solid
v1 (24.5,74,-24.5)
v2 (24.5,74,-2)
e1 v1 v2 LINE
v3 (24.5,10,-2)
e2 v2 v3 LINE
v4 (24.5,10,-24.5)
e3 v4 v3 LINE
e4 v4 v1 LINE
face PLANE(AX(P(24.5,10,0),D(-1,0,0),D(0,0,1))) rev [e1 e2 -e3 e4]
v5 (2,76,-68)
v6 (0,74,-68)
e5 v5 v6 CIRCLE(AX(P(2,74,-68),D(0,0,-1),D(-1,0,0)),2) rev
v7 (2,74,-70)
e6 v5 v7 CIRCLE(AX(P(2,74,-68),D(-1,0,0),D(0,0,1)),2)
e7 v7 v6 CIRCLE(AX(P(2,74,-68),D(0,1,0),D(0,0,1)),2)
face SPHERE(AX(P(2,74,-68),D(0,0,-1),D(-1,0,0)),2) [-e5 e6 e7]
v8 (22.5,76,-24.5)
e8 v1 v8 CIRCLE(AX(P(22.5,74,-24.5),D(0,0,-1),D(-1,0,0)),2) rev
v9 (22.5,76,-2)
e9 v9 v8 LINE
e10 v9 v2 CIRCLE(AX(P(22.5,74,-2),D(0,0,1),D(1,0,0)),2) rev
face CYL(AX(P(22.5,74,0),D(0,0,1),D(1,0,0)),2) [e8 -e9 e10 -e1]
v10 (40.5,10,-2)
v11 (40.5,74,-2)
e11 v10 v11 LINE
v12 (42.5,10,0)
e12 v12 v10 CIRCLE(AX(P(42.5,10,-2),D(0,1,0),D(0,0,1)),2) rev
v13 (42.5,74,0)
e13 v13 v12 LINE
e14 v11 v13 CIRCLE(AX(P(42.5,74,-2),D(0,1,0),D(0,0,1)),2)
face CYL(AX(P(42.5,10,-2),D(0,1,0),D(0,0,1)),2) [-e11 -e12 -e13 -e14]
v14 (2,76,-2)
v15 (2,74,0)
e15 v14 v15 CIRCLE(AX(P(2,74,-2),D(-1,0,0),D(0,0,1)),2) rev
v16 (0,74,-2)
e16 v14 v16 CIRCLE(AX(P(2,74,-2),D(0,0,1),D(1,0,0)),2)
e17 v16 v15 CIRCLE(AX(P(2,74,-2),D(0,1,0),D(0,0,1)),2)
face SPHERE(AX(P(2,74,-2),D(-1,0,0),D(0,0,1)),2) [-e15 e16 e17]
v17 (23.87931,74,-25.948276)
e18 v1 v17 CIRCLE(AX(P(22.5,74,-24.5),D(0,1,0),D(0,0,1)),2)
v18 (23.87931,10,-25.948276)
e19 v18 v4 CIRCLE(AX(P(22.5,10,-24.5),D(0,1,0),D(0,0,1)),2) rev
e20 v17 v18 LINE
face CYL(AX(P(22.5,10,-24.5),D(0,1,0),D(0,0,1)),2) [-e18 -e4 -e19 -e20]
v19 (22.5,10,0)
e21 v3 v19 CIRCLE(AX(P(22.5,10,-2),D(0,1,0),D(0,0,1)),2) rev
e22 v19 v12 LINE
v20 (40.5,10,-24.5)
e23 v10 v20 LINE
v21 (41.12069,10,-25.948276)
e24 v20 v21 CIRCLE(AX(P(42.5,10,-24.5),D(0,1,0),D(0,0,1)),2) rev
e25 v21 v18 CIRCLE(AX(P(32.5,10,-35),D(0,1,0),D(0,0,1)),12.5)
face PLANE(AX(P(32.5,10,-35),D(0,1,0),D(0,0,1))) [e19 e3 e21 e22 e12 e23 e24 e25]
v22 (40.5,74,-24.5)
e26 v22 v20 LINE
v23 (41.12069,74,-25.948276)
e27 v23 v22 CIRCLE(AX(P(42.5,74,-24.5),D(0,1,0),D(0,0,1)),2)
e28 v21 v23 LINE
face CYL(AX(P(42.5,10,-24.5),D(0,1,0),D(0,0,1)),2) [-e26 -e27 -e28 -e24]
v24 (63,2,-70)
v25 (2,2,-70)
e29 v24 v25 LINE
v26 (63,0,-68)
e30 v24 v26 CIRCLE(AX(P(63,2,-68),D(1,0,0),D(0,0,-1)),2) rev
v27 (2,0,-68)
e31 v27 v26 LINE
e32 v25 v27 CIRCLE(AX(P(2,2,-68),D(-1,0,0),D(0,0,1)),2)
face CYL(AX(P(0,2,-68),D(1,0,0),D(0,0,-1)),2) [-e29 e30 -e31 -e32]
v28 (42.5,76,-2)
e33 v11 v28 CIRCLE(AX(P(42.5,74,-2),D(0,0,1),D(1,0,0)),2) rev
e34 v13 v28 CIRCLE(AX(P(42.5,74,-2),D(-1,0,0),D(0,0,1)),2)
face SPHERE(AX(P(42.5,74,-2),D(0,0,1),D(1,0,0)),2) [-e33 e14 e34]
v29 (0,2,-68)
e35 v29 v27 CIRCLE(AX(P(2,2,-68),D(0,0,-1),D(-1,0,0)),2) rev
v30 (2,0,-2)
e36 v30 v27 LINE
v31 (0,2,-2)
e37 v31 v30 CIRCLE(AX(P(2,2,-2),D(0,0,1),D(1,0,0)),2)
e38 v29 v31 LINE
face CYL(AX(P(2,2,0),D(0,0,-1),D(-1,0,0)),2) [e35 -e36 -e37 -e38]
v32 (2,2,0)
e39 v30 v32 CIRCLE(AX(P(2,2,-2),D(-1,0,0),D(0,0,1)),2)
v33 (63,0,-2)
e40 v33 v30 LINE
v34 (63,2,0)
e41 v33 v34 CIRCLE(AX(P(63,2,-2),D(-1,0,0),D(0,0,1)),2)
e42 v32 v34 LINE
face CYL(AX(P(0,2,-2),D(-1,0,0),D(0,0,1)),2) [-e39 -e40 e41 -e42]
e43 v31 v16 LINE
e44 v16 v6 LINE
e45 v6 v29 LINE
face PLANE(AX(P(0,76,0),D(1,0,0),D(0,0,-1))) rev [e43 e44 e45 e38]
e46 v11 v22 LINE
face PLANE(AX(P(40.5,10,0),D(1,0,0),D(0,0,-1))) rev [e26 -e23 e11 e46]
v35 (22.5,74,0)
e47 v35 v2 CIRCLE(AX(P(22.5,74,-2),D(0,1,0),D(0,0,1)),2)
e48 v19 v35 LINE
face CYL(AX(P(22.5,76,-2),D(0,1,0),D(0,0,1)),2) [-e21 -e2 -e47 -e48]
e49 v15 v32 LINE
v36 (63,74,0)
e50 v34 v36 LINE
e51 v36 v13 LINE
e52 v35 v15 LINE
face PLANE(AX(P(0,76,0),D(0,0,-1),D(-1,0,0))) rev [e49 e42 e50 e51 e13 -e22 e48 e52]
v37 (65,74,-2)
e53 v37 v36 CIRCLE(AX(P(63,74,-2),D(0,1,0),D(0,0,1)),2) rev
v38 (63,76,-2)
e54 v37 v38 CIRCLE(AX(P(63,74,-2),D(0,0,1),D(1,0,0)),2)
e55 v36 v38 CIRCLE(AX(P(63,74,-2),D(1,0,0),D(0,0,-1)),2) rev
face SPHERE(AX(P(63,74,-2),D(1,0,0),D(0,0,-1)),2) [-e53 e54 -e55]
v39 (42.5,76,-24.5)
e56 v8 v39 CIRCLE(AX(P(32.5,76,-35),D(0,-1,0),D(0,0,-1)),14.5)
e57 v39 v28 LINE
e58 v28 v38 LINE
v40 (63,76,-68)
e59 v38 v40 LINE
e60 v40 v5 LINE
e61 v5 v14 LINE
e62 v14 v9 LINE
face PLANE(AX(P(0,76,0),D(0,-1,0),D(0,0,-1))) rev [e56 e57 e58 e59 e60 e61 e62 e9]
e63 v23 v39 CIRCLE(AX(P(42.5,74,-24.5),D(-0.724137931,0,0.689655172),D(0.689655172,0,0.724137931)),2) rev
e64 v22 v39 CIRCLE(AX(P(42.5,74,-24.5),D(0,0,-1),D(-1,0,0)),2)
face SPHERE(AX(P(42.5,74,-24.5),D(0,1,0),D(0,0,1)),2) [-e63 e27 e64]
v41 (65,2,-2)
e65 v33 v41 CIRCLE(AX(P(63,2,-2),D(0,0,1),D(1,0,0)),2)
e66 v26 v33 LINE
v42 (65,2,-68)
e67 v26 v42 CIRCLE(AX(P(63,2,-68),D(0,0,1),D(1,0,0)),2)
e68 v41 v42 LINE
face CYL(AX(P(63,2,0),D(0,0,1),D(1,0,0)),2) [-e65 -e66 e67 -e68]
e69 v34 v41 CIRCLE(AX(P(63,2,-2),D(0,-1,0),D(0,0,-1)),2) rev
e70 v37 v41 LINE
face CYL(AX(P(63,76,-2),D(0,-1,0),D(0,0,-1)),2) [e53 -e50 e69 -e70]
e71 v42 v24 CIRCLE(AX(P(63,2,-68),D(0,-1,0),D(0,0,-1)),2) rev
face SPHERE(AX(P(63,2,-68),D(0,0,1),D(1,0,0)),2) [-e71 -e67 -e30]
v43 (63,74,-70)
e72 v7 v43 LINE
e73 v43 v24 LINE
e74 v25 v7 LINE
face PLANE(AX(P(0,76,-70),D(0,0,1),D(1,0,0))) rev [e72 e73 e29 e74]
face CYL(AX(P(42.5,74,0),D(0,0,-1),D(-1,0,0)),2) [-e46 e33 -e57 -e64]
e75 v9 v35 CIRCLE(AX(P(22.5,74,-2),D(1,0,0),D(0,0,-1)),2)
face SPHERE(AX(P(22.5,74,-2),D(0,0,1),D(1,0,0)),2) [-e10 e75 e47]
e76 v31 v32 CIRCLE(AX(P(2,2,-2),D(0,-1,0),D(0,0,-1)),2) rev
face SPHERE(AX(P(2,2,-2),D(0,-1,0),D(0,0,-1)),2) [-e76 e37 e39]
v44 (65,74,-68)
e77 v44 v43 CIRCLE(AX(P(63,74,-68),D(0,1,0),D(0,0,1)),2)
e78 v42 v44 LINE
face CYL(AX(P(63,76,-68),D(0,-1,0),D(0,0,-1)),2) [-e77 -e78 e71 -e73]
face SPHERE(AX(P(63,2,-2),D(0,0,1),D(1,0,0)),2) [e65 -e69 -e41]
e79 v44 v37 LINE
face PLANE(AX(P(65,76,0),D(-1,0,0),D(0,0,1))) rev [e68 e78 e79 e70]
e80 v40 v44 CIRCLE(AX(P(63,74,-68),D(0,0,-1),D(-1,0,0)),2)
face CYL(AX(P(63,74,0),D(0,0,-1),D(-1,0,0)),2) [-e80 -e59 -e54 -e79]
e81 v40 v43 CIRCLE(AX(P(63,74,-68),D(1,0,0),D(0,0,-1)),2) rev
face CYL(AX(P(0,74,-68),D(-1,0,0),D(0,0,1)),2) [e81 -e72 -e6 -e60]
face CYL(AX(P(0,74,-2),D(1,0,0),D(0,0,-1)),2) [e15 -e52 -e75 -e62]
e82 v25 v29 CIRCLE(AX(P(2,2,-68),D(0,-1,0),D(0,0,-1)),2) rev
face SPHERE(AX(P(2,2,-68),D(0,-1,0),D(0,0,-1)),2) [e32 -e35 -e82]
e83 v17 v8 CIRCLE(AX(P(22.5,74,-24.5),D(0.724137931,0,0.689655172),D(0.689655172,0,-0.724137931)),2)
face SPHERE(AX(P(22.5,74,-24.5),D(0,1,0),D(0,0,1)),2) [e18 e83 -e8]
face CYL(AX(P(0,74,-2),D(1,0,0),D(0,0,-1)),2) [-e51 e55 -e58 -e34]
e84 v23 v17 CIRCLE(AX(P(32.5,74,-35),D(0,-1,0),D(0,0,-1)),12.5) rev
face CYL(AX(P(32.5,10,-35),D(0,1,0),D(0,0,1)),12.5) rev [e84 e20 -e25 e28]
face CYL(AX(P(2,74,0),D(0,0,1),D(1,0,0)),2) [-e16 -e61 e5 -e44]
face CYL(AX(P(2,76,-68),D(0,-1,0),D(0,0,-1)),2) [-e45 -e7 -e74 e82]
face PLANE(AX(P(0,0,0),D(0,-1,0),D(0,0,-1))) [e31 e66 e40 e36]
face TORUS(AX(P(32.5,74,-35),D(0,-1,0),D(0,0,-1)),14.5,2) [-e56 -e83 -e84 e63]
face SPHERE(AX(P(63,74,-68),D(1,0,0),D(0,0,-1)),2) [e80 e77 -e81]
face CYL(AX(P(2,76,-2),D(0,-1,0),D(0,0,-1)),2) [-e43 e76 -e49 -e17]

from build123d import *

# Parameters (mm, degrees)
SKETCH1_W           = 65
SKETCH1_H           = 70
BOSS_EXTRUDE1_DEPTH = 76
CUT_EXTRUDE1_DEPTH  = 66
FILLET1_R           = 2
FILLET2_R           = 2


with BuildPart() as part:
    # Sketch1 → Boss-Extrude1 (new body)
    with BuildSketch(Plane(origin=(0, 0, 0), x_dir=(1, 0, 0), z_dir=(0, 1, 0))):
        with Locations((32.5, 35)):
            Rectangle(SKETCH1_W, SKETCH1_H)
    extrude(amount=BOSS_EXTRUDE1_DEPTH)

    # Sketch2 → Cut-Extrude1 (cut)
    with BuildSketch(Plane(origin=(0, 76, 0), x_dir=(1, 0, 0), z_dir=(0, 1, 0))):
        with BuildLine():
            Line((24.5, 0), (24.5, 25.395313644))
            ThreePointArc((24.5, 25.395313644), (32.5, 47.5), (40.5, 25.395313644))
            Line((40.5, 25.395313644), (40.5, 0))
            Line((40.5, 0), (24.5, 0))
        make_face()
    extrude(amount=-CUT_EXTRUDE1_DEPTH, mode=Mode.SUBTRACT)

    # Fillet1
    fillet1_edges = [part.edges().sort_by_distance(p)[0] for p in [
        (65, 76, -35),
        (52.75, 76, 0),
        (32.5, 76, -70),
        (24.5, 43, -25.395313644),
        (40.5, 43, -25.395313644),
        (40.5, 43, 0),
        (24.5, 43, 0),
        (32.5, 76, -47.5),
        (24.5, 76, -12.697656822),
        (40.5, 76, -12.697656822),
        (0, 76, -35),
        (32.5, 0, -70),
        (32.5, 0, 0),
        (0, 0, -35),
        (0, 38, -70),
        (65, 38, -70),
        (65, 38, 0),
        (0, 38, 0),
        (12.25, 76, 0),
    ]]
    fillet(fillet1_edges, radius=FILLET1_R)

    # Fillet2
    # the kernel refuses this fillet: 2 mm, written as the material it takes off along each edge
    with BuildSketch(Plane(origin=(63, 2, -68), x_dir=(1, 0, 0), z_dir=(0, -1, 0))) as fillet2_piece_1_section:
        Polygon((0, 0), (FILLET2_R, 0), (FILLET2_R, -FILLET2_R), (0, -FILLET2_R), align=None)
    fillet2_piece_1 = extrude(amount=FILLET2_R, mode=Mode.PRIVATE)
    fillet2_piece_1 = fillet2_piece_1 - Plane(origin=(63, 2, -68), x_dir=(-0.7071067811865475, 0, 0.7071067811865475), z_dir=(0, -1, 0)) * Sphere(FILLET2_R, mode=Mode.PRIVATE)
    add(fillet2_piece_1, mode=Mode.SUBTRACT)
    with BuildSketch(Plane(origin=(63, 2, -2), x_dir=(1, 0, 0), z_dir=(0, -1, 0))) as fillet2_piece_2_section:
        Polygon((0, 0), (FILLET2_R, 0), (FILLET2_R, FILLET2_R), (0, FILLET2_R), align=None)
    fillet2_piece_2 = extrude(amount=FILLET2_R, mode=Mode.PRIVATE)
    fillet2_piece_2 = fillet2_piece_2 - Plane(origin=(63, 2, -2), x_dir=(-0.7071067811865475, 0, -0.7071067811865475), z_dir=(0, -1, 0)) * Sphere(FILLET2_R, mode=Mode.PRIVATE)
    add(fillet2_piece_2, mode=Mode.SUBTRACT)
    with BuildSketch(Plane(origin=(65, 0, -2), x_dir=(-1, 0, 0), z_dir=(0, 0, -1))) as fillet2_piece_3:
        with BuildLine():
            CenterArc((FILLET2_R, FILLET2_R), FILLET2_R, 180, 90)
            Line((0, FILLET2_R), (0, 0))
            Line((0, 0), (FILLET2_R, 0))
        make_face()
    extrude(amount=66, mode=Mode.SUBTRACT)


solid = part.part
